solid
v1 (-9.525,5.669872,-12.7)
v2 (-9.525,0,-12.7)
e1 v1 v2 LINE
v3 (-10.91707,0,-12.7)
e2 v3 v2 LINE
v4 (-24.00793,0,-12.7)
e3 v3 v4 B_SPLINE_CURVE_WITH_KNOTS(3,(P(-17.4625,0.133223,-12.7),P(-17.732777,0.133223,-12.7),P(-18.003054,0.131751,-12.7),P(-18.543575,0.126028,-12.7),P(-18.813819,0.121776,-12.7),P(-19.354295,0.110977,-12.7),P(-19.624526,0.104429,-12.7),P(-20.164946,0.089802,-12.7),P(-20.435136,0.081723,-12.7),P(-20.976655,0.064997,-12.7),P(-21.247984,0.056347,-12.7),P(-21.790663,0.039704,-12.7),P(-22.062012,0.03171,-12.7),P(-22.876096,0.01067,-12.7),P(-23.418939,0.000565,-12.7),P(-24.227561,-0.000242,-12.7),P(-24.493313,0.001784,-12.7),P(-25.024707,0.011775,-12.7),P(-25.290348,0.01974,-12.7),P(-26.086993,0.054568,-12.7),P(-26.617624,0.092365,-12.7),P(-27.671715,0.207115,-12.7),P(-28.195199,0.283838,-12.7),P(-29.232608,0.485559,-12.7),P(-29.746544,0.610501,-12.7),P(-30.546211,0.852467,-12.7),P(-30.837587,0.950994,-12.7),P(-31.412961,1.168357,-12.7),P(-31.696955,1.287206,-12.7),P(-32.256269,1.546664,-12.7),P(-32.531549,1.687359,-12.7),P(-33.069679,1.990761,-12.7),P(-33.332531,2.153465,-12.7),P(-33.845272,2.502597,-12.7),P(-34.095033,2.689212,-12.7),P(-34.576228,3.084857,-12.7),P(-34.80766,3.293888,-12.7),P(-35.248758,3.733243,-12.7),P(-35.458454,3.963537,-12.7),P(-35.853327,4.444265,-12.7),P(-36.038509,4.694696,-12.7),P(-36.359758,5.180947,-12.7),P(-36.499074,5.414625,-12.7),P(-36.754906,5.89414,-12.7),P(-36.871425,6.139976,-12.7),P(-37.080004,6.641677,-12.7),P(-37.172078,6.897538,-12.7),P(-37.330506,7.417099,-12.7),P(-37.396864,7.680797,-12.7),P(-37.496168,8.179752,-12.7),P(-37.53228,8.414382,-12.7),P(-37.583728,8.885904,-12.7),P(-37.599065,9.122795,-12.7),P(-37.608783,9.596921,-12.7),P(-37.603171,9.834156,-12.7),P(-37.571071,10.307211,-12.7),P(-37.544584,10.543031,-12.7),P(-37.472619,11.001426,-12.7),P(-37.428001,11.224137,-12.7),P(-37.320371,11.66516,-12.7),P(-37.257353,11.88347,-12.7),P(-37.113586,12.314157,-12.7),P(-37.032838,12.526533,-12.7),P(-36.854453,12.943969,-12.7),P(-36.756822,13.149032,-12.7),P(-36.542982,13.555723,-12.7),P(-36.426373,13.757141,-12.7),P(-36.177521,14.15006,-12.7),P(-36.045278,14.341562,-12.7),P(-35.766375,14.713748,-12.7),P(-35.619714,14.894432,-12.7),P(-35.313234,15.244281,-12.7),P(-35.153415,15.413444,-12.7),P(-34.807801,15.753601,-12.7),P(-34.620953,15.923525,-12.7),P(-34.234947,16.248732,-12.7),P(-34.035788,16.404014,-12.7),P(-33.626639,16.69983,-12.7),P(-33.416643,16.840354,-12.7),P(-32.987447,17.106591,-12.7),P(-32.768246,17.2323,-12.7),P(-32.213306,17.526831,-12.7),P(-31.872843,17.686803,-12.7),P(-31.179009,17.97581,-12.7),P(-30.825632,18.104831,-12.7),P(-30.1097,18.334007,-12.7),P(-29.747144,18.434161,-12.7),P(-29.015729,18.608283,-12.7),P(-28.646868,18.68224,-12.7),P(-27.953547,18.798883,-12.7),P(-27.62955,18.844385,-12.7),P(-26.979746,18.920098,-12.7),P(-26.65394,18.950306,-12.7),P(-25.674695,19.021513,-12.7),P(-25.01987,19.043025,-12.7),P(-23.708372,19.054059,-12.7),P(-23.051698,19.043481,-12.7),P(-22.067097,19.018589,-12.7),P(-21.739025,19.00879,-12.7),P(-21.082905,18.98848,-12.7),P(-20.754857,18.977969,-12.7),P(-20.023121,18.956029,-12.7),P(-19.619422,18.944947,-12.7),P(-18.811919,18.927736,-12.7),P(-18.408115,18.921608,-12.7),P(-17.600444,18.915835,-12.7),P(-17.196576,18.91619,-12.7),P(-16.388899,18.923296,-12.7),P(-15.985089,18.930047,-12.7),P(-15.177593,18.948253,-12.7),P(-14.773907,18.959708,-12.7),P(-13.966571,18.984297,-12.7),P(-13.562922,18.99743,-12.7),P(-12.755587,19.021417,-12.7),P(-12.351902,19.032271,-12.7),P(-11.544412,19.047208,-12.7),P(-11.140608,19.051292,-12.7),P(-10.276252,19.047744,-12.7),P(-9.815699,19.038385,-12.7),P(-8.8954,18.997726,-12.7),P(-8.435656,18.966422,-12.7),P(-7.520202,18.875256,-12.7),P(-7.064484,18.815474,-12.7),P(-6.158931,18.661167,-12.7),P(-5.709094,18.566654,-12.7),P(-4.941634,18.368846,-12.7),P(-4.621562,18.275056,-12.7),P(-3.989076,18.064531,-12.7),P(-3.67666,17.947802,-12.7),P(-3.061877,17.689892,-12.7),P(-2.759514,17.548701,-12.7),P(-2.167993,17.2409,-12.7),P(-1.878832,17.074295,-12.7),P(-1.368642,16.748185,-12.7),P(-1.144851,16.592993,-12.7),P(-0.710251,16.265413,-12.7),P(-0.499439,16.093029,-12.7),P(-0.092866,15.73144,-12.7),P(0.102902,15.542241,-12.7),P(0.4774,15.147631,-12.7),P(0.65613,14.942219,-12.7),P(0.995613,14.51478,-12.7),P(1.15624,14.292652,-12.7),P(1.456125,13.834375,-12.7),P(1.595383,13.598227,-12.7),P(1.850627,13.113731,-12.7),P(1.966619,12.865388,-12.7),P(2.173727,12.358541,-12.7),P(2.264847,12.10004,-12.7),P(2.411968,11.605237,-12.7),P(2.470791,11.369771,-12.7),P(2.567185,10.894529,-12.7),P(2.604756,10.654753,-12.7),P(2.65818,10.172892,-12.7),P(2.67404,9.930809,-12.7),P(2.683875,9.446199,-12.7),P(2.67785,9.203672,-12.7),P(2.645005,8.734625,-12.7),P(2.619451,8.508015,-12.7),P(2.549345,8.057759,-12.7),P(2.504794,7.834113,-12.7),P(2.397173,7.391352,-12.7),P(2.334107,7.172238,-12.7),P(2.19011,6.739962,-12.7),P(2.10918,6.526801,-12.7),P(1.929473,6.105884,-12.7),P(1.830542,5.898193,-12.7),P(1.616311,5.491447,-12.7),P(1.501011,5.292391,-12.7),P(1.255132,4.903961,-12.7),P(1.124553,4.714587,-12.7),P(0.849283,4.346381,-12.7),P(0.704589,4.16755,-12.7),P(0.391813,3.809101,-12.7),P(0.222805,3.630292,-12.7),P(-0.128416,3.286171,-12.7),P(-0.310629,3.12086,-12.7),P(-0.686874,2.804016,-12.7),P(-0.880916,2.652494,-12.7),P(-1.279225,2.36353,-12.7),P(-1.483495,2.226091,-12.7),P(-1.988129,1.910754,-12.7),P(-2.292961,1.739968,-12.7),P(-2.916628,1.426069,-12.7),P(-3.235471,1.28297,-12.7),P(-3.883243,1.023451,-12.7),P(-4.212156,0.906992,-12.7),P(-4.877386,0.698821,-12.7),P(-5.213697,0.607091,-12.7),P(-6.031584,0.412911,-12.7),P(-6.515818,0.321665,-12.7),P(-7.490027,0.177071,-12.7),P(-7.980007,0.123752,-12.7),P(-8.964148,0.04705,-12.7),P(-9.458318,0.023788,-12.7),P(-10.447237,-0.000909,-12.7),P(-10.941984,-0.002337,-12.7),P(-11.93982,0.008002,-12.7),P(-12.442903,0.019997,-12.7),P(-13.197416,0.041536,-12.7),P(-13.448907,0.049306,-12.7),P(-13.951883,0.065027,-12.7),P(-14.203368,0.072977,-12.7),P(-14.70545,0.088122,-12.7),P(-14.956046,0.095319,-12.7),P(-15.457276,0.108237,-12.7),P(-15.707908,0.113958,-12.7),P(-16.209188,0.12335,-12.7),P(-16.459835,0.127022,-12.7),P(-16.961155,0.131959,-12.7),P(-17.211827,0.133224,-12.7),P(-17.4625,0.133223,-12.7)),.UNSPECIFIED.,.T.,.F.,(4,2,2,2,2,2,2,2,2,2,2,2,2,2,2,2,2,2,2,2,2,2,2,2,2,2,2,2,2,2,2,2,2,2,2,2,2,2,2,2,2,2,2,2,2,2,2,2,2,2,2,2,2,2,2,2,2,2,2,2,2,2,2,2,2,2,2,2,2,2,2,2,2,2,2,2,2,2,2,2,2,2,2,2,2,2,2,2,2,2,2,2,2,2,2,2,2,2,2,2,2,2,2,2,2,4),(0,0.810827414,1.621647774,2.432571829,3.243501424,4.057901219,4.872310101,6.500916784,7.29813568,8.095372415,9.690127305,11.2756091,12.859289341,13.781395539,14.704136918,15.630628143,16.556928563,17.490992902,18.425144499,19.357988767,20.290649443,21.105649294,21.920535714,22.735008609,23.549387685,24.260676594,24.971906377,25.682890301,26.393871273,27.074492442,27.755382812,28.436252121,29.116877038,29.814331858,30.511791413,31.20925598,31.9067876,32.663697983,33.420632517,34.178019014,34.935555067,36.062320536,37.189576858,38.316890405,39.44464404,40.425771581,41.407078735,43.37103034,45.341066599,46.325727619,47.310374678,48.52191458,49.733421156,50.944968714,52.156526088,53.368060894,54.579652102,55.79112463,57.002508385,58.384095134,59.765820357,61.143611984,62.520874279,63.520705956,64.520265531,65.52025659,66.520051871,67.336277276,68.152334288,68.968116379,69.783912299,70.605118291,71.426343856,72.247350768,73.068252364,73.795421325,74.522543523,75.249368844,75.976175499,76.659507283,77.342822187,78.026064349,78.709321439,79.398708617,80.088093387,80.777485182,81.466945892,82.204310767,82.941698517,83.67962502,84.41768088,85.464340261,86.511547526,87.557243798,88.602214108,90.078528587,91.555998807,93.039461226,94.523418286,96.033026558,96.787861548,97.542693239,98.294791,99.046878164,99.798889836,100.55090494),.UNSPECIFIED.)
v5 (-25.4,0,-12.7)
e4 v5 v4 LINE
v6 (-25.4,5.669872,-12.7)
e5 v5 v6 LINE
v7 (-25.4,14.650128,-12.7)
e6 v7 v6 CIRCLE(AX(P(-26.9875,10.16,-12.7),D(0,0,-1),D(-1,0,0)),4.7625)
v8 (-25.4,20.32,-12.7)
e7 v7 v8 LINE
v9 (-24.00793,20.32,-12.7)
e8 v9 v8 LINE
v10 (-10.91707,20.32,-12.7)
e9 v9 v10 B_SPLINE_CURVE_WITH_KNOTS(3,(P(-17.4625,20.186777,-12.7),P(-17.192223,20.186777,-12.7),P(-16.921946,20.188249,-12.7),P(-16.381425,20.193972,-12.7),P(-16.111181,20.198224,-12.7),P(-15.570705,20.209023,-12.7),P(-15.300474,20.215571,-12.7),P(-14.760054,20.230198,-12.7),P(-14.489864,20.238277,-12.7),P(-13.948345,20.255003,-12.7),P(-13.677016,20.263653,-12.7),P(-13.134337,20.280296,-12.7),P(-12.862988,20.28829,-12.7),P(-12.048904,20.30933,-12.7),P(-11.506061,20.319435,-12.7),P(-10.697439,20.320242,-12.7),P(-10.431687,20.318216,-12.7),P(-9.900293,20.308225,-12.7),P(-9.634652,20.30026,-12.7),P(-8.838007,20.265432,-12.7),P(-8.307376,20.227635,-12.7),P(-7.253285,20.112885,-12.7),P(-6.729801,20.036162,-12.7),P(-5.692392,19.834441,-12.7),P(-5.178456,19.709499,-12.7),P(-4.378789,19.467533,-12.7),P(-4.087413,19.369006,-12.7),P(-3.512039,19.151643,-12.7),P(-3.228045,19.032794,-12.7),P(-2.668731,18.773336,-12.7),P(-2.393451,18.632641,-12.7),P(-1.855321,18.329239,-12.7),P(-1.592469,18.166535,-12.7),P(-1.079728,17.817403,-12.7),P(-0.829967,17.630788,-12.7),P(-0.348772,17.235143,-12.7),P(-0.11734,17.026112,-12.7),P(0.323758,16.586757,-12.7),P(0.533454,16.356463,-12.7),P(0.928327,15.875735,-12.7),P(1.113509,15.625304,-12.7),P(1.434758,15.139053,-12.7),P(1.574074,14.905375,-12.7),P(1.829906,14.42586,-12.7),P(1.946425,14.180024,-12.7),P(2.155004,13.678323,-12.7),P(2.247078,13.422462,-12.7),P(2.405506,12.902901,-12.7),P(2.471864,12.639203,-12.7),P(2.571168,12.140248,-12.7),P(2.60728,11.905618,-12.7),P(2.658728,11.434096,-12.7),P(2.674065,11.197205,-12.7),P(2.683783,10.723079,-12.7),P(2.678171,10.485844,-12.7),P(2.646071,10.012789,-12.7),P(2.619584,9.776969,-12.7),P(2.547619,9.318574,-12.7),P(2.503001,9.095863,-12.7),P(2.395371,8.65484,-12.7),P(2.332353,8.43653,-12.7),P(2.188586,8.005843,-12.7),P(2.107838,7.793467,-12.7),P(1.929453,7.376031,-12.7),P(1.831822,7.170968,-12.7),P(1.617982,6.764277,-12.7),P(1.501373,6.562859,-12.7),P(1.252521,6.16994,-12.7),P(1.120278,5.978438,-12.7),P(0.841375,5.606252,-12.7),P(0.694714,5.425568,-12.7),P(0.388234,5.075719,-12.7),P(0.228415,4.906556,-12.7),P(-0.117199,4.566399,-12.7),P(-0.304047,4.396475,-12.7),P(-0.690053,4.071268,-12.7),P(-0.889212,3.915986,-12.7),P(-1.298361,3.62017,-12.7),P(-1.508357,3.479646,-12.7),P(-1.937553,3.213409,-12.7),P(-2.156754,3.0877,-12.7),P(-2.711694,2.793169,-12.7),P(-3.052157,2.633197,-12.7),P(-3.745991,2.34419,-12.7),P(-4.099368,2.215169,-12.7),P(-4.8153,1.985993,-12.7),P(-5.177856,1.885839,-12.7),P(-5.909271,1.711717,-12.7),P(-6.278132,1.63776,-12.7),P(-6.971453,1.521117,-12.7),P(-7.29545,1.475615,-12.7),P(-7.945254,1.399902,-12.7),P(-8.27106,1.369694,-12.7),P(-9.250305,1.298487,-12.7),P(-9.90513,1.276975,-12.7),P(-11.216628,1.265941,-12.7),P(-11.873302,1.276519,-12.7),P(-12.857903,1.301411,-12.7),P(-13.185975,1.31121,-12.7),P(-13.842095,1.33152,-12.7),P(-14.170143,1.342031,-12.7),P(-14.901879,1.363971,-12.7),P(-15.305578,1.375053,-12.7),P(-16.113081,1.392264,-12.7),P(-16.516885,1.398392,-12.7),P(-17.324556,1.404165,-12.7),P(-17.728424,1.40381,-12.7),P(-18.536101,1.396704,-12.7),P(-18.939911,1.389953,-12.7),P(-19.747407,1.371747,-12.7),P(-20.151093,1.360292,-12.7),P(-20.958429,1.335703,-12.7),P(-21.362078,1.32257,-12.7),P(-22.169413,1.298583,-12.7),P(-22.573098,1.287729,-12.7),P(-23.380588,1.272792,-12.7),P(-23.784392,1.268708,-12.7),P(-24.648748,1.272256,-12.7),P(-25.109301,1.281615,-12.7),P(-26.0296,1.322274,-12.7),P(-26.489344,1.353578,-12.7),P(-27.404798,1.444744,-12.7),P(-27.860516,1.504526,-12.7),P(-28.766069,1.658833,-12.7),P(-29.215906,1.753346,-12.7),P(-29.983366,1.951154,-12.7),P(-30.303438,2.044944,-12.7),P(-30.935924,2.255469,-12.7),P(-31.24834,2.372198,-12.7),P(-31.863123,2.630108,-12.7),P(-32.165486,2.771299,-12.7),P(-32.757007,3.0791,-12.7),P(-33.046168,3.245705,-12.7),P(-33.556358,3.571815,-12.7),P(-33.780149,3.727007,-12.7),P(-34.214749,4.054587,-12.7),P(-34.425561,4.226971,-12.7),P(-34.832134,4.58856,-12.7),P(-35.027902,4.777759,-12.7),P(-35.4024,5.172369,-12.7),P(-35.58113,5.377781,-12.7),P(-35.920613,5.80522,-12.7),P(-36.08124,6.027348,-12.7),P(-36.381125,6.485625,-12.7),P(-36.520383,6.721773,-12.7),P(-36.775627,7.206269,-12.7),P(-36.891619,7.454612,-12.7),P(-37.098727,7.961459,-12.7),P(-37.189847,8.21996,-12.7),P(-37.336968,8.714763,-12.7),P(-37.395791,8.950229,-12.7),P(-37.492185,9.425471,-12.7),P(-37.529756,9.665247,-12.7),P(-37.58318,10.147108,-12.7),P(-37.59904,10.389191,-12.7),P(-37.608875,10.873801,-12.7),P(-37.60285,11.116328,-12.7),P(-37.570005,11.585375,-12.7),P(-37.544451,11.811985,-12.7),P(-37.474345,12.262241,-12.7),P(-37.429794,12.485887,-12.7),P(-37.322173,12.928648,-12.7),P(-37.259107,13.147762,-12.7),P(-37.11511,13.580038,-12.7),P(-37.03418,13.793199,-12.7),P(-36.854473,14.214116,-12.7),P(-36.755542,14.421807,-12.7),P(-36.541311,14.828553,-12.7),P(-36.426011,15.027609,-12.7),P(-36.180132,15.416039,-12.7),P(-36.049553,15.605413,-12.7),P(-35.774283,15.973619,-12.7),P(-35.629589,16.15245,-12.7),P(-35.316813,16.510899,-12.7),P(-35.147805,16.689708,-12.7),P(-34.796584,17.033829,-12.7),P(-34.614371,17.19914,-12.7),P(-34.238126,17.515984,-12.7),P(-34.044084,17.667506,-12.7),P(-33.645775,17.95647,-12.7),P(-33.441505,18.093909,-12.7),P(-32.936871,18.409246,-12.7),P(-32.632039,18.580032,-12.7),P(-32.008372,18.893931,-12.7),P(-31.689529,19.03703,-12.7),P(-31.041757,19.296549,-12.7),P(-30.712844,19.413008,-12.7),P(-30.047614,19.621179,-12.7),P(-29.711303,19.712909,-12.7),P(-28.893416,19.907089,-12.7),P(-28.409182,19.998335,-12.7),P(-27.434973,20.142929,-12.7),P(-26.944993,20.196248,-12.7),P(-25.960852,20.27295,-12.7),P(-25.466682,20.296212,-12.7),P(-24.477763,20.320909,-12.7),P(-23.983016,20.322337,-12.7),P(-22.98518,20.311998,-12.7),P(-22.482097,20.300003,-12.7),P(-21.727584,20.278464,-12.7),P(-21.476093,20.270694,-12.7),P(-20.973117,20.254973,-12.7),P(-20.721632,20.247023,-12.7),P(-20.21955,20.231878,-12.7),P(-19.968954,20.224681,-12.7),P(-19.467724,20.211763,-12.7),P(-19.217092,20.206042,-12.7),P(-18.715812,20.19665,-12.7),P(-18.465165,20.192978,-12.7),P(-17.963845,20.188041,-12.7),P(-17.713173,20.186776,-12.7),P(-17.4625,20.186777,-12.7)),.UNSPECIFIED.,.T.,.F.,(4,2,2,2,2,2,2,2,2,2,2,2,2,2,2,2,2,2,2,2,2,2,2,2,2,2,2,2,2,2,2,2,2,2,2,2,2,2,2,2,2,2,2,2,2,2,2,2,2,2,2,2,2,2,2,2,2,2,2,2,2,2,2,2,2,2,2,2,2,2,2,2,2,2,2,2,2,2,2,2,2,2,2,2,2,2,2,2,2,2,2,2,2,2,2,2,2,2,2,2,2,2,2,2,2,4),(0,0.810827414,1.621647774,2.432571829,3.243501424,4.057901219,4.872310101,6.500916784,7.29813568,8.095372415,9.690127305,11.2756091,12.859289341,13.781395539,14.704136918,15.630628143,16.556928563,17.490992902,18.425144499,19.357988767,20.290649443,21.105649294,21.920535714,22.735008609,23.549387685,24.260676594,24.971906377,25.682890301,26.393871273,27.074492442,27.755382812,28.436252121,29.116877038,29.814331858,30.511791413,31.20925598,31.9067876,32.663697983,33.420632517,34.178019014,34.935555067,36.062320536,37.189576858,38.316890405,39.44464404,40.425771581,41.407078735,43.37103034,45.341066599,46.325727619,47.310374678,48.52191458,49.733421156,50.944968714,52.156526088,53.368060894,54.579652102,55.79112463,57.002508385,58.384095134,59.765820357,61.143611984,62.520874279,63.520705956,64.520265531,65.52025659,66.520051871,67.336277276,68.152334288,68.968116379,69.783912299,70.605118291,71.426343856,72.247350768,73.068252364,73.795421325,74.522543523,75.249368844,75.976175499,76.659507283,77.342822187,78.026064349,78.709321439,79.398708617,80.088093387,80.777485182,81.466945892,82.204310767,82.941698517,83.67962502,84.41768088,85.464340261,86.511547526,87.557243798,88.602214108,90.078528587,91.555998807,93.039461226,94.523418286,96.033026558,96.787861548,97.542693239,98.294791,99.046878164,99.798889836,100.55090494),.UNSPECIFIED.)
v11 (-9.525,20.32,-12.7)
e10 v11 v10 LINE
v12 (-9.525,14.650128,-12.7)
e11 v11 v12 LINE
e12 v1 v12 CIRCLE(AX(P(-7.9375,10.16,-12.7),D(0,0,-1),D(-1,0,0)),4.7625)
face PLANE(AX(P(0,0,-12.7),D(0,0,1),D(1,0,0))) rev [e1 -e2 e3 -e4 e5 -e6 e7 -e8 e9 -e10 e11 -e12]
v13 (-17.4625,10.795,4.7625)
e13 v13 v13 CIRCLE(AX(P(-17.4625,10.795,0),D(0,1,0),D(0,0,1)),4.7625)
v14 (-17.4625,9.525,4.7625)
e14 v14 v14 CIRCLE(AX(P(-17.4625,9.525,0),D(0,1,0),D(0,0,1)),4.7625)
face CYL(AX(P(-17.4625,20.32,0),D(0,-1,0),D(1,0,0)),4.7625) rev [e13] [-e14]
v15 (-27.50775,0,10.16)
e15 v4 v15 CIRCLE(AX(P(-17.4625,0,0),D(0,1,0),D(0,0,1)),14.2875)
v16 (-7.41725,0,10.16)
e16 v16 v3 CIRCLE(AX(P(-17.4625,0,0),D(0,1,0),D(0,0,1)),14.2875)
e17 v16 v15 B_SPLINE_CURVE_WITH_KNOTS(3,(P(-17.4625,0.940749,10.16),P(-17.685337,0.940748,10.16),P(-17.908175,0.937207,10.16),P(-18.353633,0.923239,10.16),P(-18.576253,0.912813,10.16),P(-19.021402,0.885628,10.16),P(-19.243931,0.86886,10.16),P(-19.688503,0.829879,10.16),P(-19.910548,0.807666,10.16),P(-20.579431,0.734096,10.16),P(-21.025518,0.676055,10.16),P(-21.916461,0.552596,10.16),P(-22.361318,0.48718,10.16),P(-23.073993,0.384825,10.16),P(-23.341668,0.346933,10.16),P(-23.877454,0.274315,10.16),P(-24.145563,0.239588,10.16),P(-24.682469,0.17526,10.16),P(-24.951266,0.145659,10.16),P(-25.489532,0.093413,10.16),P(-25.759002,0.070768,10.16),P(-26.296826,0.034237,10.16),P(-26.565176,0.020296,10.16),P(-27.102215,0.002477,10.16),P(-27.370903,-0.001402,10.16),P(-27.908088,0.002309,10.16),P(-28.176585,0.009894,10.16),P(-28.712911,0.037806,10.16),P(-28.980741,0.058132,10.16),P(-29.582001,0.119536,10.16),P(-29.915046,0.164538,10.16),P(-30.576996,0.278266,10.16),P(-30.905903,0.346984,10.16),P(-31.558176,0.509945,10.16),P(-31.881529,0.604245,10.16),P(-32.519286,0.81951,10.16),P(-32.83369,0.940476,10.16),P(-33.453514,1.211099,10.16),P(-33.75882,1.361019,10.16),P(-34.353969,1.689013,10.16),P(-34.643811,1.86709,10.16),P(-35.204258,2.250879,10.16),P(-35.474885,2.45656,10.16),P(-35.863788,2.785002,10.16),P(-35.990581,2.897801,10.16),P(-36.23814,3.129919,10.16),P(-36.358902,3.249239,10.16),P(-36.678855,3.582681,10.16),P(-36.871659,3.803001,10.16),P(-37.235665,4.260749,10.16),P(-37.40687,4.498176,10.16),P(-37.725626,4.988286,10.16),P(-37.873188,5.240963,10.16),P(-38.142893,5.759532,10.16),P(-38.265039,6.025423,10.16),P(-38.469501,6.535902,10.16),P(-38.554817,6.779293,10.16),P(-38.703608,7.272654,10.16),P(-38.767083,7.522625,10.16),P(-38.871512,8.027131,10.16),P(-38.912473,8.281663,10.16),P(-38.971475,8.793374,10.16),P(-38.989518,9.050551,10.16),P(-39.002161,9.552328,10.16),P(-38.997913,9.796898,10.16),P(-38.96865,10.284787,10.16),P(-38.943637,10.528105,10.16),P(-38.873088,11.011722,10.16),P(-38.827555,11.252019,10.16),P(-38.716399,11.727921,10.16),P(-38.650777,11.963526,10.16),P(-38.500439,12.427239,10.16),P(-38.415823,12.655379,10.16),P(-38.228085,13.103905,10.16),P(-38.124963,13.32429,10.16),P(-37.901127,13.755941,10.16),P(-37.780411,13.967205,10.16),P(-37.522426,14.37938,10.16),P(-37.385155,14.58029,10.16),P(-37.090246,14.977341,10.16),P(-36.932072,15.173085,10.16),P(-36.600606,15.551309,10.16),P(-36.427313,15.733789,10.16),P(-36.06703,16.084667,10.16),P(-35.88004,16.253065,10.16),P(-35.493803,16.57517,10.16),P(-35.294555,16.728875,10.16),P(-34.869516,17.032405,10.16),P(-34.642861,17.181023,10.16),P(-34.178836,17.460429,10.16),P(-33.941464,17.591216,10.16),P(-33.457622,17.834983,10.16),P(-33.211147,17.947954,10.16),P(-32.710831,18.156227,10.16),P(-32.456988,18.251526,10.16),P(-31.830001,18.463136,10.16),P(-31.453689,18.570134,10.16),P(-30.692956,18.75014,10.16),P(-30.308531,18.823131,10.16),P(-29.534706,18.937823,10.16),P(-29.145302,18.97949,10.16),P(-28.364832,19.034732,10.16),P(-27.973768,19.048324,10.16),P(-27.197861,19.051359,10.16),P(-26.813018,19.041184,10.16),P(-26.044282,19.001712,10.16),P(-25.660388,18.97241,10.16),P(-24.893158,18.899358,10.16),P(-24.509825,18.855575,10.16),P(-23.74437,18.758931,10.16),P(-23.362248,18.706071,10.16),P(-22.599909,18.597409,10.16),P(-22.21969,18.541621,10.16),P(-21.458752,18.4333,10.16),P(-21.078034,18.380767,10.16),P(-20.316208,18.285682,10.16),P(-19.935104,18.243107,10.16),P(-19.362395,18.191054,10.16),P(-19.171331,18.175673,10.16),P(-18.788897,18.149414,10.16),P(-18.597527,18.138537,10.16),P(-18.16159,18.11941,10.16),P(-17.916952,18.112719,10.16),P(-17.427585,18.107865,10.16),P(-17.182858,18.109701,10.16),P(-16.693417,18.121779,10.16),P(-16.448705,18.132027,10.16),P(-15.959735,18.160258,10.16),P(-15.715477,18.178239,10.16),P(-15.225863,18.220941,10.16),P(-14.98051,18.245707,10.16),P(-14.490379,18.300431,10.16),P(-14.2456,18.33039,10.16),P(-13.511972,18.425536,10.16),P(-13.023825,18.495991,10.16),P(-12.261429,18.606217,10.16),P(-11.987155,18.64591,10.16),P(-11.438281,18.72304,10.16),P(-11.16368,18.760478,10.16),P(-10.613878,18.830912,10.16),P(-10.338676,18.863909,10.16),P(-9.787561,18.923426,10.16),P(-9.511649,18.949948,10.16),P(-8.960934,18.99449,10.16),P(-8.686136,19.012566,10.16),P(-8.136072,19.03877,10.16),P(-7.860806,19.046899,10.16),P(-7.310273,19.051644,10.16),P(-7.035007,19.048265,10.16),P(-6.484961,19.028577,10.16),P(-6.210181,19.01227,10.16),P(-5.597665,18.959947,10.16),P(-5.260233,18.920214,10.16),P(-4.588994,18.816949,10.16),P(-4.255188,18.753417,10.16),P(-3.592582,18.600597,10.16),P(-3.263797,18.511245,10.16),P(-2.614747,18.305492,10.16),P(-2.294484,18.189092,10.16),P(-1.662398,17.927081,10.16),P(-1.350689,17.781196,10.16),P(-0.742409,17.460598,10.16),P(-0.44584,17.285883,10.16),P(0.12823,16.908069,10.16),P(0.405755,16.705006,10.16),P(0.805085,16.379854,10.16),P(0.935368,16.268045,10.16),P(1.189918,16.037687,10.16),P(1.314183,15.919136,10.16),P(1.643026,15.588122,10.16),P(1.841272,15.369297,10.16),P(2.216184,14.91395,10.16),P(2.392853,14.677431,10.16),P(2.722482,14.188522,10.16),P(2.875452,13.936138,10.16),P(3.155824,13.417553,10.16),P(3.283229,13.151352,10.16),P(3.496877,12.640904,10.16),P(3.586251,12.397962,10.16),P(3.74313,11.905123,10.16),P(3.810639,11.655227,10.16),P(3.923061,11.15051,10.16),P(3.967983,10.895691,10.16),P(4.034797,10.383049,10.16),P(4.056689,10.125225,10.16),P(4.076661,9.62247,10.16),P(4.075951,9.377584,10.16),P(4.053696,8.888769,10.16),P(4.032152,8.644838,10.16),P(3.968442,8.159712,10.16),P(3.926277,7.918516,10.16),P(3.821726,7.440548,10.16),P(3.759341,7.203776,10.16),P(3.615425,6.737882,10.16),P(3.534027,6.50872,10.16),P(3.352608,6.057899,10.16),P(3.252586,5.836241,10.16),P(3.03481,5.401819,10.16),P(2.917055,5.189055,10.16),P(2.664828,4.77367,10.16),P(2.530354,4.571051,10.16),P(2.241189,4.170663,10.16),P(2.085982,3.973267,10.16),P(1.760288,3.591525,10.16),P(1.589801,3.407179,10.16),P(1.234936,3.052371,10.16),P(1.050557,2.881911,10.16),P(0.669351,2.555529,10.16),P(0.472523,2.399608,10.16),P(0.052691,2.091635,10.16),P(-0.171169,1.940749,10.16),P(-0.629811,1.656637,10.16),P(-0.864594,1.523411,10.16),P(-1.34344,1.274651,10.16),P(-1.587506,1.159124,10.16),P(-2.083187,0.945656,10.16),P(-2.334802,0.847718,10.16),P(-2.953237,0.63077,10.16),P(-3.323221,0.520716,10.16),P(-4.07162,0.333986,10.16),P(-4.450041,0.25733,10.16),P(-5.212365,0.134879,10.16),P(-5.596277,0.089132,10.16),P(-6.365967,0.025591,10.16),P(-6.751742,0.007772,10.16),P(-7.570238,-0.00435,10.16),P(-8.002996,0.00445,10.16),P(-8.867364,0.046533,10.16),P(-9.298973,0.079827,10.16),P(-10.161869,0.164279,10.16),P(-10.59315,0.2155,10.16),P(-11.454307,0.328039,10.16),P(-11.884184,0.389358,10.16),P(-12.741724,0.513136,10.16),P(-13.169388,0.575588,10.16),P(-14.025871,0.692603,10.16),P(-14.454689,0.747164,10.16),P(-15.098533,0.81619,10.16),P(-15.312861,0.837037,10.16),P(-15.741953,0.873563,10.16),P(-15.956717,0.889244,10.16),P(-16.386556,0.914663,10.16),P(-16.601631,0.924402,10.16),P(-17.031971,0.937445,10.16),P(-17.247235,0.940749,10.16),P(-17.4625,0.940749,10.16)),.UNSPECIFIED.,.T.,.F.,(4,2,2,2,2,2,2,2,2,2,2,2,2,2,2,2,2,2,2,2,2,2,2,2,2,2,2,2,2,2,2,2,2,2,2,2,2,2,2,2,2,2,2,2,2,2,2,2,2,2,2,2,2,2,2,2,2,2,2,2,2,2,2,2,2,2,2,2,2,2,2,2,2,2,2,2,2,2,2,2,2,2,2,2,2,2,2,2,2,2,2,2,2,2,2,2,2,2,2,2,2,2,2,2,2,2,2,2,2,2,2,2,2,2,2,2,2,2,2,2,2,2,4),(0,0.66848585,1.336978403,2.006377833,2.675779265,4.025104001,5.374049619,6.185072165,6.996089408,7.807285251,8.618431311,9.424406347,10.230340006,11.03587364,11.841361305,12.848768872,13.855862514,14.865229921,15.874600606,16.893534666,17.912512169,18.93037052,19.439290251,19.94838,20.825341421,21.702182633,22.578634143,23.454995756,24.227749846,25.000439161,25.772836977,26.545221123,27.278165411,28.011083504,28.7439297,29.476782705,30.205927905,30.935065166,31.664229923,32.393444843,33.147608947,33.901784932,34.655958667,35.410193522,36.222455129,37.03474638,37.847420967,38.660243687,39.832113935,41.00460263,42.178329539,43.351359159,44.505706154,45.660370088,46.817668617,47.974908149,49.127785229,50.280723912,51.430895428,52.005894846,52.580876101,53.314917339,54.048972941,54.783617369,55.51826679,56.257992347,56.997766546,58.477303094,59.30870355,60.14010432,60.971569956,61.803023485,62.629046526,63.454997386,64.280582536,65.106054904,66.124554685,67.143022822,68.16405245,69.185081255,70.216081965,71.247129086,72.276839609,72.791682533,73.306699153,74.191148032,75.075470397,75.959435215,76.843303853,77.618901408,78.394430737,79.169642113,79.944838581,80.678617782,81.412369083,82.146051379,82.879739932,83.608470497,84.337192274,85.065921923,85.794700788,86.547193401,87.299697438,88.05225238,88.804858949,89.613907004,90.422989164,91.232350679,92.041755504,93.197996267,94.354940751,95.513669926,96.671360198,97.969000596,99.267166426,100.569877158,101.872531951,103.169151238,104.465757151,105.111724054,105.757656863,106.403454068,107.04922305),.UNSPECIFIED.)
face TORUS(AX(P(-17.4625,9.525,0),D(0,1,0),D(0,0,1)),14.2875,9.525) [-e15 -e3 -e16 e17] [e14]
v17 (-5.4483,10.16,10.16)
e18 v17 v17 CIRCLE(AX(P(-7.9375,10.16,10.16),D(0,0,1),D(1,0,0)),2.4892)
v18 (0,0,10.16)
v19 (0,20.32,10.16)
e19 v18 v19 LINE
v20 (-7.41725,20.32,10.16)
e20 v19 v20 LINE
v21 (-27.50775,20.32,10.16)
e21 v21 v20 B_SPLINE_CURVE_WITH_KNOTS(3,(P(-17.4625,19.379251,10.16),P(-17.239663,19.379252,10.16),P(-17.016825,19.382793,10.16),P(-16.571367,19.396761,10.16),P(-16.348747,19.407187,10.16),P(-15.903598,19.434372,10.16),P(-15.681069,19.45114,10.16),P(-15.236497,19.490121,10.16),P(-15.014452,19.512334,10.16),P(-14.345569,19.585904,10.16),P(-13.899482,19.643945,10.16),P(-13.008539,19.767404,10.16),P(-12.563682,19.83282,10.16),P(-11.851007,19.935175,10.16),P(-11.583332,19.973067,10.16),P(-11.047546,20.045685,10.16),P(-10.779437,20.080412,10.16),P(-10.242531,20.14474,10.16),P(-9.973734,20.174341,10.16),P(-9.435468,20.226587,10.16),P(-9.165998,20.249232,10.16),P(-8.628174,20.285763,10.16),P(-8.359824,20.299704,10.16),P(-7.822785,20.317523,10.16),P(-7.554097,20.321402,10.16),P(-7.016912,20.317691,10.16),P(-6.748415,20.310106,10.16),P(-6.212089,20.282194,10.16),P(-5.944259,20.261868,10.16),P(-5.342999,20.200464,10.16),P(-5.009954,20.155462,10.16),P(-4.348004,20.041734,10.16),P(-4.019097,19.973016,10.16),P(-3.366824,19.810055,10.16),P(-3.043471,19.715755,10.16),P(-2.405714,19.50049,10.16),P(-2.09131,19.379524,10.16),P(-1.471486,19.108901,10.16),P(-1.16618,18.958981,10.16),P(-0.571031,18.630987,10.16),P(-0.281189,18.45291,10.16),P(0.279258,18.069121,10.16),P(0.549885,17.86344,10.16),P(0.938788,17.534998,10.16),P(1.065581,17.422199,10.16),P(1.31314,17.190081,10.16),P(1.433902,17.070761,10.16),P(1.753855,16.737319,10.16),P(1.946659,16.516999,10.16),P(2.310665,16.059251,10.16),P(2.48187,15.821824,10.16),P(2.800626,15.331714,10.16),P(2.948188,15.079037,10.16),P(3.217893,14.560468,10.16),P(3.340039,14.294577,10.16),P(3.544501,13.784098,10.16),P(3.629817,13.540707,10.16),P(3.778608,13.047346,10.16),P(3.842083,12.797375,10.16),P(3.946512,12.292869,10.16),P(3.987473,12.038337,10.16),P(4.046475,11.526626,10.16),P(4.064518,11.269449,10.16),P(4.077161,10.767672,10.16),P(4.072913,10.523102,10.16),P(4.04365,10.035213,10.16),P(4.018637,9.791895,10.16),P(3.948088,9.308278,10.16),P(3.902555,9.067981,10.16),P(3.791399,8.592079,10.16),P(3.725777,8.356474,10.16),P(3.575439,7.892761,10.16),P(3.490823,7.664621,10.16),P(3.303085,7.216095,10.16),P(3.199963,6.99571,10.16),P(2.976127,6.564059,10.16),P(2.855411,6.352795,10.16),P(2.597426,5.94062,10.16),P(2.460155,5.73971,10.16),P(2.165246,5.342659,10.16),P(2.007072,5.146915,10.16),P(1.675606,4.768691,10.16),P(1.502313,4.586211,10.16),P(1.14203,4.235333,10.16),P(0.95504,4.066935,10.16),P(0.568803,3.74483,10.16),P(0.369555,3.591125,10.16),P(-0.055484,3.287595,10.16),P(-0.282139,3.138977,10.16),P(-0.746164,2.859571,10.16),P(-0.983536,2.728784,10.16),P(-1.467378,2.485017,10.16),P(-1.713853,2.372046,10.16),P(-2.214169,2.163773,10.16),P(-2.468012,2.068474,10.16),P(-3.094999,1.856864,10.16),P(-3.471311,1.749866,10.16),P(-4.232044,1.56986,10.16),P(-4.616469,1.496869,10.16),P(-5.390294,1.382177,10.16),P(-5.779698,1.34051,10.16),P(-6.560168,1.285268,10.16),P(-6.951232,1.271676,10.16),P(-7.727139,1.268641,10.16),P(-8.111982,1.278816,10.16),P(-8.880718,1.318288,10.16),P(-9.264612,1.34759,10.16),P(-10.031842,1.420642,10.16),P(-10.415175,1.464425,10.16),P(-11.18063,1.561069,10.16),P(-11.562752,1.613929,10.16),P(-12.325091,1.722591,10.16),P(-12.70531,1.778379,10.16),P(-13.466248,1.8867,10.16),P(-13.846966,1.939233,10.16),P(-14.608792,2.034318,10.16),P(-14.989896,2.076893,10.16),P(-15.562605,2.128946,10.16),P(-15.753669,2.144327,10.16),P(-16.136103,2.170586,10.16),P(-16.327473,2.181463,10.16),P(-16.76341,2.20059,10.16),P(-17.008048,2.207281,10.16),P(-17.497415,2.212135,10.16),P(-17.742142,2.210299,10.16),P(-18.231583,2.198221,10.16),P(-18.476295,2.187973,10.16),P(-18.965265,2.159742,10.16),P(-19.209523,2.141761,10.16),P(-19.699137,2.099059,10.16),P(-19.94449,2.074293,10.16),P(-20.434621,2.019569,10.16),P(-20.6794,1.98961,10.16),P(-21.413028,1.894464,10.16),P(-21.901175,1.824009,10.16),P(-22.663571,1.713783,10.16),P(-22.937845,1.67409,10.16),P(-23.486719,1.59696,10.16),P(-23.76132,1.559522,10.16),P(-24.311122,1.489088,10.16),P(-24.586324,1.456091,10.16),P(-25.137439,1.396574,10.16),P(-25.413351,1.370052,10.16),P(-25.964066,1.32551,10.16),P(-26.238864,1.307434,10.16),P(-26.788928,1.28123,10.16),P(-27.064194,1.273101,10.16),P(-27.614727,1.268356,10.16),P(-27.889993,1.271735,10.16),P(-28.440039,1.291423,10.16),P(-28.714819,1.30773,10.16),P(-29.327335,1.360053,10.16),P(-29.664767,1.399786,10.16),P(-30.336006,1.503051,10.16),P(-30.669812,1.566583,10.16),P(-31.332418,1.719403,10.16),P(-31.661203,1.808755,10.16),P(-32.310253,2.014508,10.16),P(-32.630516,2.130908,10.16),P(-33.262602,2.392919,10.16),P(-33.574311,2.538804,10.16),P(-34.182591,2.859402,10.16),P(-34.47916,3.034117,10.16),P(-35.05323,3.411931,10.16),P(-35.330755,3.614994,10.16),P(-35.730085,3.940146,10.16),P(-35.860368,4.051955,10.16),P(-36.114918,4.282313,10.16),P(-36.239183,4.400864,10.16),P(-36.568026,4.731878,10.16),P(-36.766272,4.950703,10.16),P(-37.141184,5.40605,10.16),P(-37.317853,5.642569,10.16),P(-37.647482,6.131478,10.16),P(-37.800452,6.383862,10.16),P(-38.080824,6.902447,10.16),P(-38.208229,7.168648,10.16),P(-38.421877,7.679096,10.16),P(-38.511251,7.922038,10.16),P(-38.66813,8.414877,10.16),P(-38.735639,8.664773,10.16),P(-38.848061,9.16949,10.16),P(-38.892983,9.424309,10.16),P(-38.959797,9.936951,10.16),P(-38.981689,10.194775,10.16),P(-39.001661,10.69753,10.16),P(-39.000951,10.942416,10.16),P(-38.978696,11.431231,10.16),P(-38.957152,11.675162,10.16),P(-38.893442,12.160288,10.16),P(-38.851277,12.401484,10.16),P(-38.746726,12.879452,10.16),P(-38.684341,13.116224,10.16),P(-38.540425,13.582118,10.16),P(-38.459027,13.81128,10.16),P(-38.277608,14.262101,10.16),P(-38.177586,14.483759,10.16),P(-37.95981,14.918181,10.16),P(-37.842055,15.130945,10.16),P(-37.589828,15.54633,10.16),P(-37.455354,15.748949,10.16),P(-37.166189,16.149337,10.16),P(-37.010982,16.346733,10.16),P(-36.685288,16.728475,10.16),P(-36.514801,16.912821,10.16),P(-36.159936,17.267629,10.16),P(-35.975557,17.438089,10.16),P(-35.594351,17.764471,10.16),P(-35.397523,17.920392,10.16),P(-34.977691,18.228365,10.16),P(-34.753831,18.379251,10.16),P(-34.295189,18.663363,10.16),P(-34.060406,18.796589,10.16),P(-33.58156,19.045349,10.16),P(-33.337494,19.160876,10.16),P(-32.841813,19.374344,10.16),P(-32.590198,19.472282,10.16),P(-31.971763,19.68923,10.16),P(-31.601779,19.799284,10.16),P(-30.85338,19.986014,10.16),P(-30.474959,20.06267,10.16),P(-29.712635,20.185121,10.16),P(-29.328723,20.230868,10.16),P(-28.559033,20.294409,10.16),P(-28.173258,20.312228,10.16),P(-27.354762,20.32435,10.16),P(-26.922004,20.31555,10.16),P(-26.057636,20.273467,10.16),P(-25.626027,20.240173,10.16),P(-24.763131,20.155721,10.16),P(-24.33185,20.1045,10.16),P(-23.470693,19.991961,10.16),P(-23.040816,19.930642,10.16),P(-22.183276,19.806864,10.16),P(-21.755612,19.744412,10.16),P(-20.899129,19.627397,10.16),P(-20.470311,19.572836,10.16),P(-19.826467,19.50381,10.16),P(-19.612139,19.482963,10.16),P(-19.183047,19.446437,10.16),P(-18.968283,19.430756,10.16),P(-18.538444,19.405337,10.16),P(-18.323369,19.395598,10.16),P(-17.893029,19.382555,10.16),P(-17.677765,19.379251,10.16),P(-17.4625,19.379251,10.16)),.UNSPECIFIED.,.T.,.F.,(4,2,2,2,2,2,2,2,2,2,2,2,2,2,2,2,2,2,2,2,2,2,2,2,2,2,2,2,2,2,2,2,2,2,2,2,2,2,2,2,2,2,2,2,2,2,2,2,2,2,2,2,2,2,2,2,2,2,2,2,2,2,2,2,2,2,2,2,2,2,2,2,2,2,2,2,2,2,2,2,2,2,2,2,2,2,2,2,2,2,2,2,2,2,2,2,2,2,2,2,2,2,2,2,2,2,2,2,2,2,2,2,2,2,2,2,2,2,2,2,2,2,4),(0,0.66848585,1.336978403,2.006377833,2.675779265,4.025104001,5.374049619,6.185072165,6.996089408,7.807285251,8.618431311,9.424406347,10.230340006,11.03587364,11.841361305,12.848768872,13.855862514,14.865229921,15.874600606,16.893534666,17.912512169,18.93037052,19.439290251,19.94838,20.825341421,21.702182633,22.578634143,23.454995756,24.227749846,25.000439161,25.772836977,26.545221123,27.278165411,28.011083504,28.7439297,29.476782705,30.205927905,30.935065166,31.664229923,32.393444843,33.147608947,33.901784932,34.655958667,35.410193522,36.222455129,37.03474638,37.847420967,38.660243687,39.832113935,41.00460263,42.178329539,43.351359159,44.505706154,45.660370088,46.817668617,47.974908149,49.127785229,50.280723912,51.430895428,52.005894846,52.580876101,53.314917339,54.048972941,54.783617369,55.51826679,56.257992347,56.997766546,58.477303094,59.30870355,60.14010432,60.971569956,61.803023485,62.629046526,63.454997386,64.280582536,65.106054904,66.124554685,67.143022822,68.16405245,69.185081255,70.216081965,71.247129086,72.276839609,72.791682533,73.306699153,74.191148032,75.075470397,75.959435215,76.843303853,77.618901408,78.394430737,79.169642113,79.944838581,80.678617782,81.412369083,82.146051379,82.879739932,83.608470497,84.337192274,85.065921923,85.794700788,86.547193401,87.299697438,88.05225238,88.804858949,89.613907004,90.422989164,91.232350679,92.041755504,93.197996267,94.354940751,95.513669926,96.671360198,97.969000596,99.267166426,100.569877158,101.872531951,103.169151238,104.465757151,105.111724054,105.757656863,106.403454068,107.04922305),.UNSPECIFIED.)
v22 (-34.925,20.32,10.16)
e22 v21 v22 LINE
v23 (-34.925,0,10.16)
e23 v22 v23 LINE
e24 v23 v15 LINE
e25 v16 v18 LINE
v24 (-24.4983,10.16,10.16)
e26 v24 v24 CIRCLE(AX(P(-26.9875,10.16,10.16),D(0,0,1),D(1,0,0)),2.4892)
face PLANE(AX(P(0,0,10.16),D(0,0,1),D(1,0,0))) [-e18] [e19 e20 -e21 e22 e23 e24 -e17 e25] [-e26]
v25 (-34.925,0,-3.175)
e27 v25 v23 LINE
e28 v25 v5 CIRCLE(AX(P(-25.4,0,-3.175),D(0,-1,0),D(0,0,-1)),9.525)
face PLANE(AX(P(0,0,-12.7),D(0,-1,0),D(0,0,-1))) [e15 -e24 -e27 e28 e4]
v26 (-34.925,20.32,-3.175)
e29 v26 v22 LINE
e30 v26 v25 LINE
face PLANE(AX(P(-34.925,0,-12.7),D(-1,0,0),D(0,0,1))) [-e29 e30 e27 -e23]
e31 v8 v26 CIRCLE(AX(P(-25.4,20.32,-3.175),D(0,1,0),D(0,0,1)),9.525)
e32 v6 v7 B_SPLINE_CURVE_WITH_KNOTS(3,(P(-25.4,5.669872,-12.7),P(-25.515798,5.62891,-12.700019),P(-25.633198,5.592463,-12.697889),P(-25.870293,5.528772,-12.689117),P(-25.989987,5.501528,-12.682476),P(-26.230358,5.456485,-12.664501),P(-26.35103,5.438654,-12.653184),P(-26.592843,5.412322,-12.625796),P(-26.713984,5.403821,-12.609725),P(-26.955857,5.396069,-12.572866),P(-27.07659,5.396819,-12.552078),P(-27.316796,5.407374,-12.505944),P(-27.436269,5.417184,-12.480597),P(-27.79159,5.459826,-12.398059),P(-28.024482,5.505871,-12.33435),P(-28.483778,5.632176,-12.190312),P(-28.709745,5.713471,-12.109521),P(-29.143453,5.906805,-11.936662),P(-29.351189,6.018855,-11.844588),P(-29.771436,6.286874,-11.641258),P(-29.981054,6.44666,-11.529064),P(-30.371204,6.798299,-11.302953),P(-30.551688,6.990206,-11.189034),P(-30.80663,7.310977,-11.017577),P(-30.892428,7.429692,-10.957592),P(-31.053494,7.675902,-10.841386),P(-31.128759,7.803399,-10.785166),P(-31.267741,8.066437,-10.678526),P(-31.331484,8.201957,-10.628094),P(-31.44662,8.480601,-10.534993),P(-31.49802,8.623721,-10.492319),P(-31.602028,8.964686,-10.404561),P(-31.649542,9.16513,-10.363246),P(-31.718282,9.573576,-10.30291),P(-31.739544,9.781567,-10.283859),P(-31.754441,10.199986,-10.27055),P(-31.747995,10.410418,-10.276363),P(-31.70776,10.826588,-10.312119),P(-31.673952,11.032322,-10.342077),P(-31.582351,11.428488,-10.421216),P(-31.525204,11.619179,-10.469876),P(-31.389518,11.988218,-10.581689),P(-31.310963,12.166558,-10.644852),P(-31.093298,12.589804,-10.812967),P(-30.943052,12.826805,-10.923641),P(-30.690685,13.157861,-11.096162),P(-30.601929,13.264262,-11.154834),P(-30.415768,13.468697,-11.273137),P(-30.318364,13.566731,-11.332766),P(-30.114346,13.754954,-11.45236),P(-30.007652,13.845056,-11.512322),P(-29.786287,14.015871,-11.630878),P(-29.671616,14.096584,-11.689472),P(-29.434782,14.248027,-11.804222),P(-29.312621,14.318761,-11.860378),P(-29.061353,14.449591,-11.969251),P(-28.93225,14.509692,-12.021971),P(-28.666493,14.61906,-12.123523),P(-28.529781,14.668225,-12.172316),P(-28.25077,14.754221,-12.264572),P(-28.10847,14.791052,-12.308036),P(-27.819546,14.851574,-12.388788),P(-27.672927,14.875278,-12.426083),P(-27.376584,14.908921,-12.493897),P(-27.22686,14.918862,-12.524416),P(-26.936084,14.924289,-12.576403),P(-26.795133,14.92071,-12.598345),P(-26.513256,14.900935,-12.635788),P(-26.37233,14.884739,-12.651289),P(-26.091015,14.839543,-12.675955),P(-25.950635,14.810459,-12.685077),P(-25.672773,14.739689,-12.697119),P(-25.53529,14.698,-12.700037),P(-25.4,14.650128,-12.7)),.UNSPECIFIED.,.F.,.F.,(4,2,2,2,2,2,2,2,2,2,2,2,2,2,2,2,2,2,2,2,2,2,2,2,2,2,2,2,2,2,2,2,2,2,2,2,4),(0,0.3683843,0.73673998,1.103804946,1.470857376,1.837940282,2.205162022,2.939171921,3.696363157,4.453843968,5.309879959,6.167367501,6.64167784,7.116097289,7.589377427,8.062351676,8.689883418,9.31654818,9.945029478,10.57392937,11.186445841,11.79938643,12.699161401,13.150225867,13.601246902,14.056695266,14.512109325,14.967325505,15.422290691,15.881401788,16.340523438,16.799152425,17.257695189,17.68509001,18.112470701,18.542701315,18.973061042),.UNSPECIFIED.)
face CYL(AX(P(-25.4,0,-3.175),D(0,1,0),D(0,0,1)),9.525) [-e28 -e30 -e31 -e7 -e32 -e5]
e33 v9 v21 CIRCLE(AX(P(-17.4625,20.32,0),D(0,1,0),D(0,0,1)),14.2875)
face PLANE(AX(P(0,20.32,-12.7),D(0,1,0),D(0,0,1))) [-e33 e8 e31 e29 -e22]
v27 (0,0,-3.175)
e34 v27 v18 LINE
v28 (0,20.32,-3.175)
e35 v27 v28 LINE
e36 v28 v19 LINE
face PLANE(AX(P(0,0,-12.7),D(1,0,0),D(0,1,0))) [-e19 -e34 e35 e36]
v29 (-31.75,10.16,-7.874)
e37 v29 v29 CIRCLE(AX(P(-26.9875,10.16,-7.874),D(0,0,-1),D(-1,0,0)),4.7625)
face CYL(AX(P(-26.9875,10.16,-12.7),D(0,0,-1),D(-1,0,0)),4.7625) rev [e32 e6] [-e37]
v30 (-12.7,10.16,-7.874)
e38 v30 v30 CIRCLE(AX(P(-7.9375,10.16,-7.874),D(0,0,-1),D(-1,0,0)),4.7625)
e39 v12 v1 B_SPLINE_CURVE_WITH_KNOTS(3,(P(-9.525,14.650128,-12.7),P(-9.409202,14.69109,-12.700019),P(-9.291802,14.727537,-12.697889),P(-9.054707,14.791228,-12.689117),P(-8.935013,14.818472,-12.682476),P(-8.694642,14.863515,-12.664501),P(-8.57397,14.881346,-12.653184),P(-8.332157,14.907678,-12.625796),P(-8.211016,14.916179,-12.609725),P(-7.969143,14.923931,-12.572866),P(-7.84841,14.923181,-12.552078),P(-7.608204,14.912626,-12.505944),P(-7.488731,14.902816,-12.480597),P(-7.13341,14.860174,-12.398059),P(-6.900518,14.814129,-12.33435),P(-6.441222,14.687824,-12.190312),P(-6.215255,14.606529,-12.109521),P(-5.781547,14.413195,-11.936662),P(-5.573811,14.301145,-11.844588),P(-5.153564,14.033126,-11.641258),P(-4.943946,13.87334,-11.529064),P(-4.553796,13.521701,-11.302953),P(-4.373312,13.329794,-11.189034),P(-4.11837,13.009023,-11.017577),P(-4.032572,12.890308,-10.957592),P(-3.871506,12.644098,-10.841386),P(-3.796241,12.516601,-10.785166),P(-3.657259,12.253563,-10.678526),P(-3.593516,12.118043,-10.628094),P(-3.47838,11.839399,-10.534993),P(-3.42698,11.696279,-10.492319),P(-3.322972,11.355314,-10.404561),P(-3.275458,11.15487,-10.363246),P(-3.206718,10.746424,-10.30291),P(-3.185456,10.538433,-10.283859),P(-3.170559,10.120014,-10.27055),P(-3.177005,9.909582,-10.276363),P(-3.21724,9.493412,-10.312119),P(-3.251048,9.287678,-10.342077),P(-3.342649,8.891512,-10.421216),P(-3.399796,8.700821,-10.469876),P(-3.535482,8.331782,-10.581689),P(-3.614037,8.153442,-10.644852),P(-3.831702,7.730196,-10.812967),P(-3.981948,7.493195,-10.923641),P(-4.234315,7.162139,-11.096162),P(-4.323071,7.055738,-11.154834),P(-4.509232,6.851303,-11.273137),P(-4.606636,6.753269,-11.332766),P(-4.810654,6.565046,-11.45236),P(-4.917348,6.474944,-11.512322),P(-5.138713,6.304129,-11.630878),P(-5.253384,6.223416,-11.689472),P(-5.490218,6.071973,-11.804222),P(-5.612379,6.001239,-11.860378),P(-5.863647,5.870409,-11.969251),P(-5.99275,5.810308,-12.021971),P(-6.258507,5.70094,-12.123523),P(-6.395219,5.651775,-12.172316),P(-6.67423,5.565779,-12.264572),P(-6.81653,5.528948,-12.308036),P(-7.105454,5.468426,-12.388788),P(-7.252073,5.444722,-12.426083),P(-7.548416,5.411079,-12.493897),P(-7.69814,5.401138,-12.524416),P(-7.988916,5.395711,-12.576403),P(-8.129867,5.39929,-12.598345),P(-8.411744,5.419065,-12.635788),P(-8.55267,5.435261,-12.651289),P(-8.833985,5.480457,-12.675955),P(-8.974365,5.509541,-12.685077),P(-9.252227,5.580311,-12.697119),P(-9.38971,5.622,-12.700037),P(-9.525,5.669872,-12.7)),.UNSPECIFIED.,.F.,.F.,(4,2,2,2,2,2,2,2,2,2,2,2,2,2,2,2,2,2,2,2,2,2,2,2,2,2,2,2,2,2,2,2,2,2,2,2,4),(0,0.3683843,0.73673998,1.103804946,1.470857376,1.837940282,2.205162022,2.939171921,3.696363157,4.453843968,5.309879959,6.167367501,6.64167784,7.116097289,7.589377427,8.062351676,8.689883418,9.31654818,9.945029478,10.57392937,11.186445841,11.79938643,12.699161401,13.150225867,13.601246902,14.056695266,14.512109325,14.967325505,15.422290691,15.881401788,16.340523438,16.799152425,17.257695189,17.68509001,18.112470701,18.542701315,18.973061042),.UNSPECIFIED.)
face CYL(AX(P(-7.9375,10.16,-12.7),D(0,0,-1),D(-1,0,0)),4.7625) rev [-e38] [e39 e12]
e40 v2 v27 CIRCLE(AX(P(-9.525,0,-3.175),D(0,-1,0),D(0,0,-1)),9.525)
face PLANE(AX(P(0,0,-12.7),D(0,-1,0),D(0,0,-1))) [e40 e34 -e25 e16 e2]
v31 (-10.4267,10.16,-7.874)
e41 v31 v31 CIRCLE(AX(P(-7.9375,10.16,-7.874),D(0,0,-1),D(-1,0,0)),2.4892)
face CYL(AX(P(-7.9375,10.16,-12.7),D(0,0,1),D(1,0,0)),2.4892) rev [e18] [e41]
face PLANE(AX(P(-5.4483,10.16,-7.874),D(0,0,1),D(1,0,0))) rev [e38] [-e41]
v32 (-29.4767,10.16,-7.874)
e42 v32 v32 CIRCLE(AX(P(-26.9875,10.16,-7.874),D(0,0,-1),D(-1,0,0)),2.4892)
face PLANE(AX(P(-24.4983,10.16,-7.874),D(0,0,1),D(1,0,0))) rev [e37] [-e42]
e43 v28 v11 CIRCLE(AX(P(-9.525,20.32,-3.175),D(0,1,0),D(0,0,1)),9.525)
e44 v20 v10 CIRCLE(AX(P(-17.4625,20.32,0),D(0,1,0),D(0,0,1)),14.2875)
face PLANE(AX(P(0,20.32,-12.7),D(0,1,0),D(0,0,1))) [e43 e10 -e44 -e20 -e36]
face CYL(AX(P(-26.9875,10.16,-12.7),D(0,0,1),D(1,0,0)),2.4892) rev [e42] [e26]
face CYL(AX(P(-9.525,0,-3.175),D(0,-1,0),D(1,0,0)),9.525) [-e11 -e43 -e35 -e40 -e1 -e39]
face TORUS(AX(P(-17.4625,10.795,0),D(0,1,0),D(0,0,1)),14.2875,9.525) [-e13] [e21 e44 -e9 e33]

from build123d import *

# Parameters (mm, degrees)
BOSS_EXTRUDE1_DEPTH                             = 10.16
BOSS_EXTRUDE1_DEPTH_BACK                        = 12.7
SKETCH2_W                                       = 34.925
SKETCH2_H                                       = 20.32
SKETCH2_R                                       = 2.4892
SKETCH3_R                                       = 4.7625
CUT_EXTRUDE1_DEPTH                              = 43.35502361
CBORE_FOR_10_SOCKET_HEAD_CAP_SCREW1_D           = 4.9784
CBORE_FOR_10_SOCKET_HEAD_CAP_SCREW1_CBORE_D     = 9.525
CBORE_FOR_10_SOCKET_HEAD_CAP_SCREW1_CBORE_DEPTH = 4.826
FILLET1_R                                       = 9.525


with BuildPart() as part:
    # Sketch2 → Boss-Extrude1 (new, two sides: drawn at the far end of the back side and taken through both)
    with BuildSketch(Plane.XY.offset(-BOSS_EXTRUDE1_DEPTH_BACK)):
        with Locations((-17.4625, 10.16)):
            Rectangle(SKETCH2_W, SKETCH2_H)
        with Locations((-7.9375, 10.16)):
            Circle(SKETCH2_R, mode=Mode.SUBTRACT)
        with Locations((-26.9875, 10.16)):
            Circle(SKETCH2_R, mode=Mode.SUBTRACT)
    extrude(amount=BOSS_EXTRUDE1_DEPTH + BOSS_EXTRUDE1_DEPTH_BACK)

    # Sketch3 → Cut-Extrude1 (cut, through all)
    with BuildSketch(Plane.XZ):
        with Locations((-17.4625, 0)):
            Circle(SKETCH3_R)
    extrude(amount=-CUT_EXTRUDE1_DEPTH, mode=Mode.SUBTRACT)

    # Sketch4 → Cut-Revolve1 (revolve, cut)
    with BuildSketch(Plane.XY, mode=Mode.PRIVATE) as cut_revolve1_sk:
        with BuildLine():
            Line((-31.75, 20.32), (-17.4625, 20.32))
            Line((-17.4625, 20.32), (-17.4625, 0))
            Line((-17.4625, 0), (-31.75, 0))
            ThreePointArc((-31.75, 0), (-25.014807909, 2.789807909), (-22.225, 9.525))
            Line((-22.225, 9.525), (-22.225, 10.795))
            ThreePointArc((-22.225, 10.795), (-25.014807909, 17.530192091), (-31.75, 20.32))
        make_face()
    revolve(cut_revolve1_sk.sketch.rotate(Axis((-17.4625, 20.32, 0), (0, -1, 0)), 270), axis=Axis((-17.4625, 20.32, 0), (0, -1, 0)), mode=Mode.SUBTRACT)

    # CBORE for #10 Socket Head Cap Screw1 (through all)
    with Locations(Plane(origin=(0, 0, -12.7), x_dir=(-1, 0, 0), z_dir=(0, 0, -1))):
        with Locations((26.9875, 10.16), (7.9375, 10.16)):
            CounterBoreHole(CBORE_FOR_10_SOCKET_HEAD_CAP_SCREW1_D / 2, CBORE_FOR_10_SOCKET_HEAD_CAP_SCREW1_CBORE_D / 2, CBORE_FOR_10_SOCKET_HEAD_CAP_SCREW1_CBORE_DEPTH)

    # Fillet1
    # the kernel refuses this fillet: 9.525 mm, written as the material it takes off along each edge
    with BuildSketch(Plane(origin=(-34.925, -23.8125, -12.7), x_dir=(1, 0, 0), z_dir=(0, 1, 0))) as fillet1_piece_1:
        with BuildLine():
            CenterArc((FILLET1_R, -FILLET1_R), FILLET1_R, 90, 90)
            Line((0, -FILLET1_R), (0, 0))
            Line((0, 0), (FILLET1_R, 0))
        make_face()
    extrude(amount=67.945, mode=Mode.SUBTRACT)
    with BuildSketch(Plane(origin=(0, 44.1325, -12.7), x_dir=(0, 0, 1), z_dir=(0, -1, 0))) as fillet1_piece_2:
        with BuildLine():
            CenterArc((FILLET1_R, FILLET1_R), FILLET1_R, 180, 90)
            Line((0, FILLET1_R), (0, 0))
            Line((0, 0), (FILLET1_R, 0))
        make_face()
    extrude(amount=67.945, mode=Mode.SUBTRACT)


solid = part.part
